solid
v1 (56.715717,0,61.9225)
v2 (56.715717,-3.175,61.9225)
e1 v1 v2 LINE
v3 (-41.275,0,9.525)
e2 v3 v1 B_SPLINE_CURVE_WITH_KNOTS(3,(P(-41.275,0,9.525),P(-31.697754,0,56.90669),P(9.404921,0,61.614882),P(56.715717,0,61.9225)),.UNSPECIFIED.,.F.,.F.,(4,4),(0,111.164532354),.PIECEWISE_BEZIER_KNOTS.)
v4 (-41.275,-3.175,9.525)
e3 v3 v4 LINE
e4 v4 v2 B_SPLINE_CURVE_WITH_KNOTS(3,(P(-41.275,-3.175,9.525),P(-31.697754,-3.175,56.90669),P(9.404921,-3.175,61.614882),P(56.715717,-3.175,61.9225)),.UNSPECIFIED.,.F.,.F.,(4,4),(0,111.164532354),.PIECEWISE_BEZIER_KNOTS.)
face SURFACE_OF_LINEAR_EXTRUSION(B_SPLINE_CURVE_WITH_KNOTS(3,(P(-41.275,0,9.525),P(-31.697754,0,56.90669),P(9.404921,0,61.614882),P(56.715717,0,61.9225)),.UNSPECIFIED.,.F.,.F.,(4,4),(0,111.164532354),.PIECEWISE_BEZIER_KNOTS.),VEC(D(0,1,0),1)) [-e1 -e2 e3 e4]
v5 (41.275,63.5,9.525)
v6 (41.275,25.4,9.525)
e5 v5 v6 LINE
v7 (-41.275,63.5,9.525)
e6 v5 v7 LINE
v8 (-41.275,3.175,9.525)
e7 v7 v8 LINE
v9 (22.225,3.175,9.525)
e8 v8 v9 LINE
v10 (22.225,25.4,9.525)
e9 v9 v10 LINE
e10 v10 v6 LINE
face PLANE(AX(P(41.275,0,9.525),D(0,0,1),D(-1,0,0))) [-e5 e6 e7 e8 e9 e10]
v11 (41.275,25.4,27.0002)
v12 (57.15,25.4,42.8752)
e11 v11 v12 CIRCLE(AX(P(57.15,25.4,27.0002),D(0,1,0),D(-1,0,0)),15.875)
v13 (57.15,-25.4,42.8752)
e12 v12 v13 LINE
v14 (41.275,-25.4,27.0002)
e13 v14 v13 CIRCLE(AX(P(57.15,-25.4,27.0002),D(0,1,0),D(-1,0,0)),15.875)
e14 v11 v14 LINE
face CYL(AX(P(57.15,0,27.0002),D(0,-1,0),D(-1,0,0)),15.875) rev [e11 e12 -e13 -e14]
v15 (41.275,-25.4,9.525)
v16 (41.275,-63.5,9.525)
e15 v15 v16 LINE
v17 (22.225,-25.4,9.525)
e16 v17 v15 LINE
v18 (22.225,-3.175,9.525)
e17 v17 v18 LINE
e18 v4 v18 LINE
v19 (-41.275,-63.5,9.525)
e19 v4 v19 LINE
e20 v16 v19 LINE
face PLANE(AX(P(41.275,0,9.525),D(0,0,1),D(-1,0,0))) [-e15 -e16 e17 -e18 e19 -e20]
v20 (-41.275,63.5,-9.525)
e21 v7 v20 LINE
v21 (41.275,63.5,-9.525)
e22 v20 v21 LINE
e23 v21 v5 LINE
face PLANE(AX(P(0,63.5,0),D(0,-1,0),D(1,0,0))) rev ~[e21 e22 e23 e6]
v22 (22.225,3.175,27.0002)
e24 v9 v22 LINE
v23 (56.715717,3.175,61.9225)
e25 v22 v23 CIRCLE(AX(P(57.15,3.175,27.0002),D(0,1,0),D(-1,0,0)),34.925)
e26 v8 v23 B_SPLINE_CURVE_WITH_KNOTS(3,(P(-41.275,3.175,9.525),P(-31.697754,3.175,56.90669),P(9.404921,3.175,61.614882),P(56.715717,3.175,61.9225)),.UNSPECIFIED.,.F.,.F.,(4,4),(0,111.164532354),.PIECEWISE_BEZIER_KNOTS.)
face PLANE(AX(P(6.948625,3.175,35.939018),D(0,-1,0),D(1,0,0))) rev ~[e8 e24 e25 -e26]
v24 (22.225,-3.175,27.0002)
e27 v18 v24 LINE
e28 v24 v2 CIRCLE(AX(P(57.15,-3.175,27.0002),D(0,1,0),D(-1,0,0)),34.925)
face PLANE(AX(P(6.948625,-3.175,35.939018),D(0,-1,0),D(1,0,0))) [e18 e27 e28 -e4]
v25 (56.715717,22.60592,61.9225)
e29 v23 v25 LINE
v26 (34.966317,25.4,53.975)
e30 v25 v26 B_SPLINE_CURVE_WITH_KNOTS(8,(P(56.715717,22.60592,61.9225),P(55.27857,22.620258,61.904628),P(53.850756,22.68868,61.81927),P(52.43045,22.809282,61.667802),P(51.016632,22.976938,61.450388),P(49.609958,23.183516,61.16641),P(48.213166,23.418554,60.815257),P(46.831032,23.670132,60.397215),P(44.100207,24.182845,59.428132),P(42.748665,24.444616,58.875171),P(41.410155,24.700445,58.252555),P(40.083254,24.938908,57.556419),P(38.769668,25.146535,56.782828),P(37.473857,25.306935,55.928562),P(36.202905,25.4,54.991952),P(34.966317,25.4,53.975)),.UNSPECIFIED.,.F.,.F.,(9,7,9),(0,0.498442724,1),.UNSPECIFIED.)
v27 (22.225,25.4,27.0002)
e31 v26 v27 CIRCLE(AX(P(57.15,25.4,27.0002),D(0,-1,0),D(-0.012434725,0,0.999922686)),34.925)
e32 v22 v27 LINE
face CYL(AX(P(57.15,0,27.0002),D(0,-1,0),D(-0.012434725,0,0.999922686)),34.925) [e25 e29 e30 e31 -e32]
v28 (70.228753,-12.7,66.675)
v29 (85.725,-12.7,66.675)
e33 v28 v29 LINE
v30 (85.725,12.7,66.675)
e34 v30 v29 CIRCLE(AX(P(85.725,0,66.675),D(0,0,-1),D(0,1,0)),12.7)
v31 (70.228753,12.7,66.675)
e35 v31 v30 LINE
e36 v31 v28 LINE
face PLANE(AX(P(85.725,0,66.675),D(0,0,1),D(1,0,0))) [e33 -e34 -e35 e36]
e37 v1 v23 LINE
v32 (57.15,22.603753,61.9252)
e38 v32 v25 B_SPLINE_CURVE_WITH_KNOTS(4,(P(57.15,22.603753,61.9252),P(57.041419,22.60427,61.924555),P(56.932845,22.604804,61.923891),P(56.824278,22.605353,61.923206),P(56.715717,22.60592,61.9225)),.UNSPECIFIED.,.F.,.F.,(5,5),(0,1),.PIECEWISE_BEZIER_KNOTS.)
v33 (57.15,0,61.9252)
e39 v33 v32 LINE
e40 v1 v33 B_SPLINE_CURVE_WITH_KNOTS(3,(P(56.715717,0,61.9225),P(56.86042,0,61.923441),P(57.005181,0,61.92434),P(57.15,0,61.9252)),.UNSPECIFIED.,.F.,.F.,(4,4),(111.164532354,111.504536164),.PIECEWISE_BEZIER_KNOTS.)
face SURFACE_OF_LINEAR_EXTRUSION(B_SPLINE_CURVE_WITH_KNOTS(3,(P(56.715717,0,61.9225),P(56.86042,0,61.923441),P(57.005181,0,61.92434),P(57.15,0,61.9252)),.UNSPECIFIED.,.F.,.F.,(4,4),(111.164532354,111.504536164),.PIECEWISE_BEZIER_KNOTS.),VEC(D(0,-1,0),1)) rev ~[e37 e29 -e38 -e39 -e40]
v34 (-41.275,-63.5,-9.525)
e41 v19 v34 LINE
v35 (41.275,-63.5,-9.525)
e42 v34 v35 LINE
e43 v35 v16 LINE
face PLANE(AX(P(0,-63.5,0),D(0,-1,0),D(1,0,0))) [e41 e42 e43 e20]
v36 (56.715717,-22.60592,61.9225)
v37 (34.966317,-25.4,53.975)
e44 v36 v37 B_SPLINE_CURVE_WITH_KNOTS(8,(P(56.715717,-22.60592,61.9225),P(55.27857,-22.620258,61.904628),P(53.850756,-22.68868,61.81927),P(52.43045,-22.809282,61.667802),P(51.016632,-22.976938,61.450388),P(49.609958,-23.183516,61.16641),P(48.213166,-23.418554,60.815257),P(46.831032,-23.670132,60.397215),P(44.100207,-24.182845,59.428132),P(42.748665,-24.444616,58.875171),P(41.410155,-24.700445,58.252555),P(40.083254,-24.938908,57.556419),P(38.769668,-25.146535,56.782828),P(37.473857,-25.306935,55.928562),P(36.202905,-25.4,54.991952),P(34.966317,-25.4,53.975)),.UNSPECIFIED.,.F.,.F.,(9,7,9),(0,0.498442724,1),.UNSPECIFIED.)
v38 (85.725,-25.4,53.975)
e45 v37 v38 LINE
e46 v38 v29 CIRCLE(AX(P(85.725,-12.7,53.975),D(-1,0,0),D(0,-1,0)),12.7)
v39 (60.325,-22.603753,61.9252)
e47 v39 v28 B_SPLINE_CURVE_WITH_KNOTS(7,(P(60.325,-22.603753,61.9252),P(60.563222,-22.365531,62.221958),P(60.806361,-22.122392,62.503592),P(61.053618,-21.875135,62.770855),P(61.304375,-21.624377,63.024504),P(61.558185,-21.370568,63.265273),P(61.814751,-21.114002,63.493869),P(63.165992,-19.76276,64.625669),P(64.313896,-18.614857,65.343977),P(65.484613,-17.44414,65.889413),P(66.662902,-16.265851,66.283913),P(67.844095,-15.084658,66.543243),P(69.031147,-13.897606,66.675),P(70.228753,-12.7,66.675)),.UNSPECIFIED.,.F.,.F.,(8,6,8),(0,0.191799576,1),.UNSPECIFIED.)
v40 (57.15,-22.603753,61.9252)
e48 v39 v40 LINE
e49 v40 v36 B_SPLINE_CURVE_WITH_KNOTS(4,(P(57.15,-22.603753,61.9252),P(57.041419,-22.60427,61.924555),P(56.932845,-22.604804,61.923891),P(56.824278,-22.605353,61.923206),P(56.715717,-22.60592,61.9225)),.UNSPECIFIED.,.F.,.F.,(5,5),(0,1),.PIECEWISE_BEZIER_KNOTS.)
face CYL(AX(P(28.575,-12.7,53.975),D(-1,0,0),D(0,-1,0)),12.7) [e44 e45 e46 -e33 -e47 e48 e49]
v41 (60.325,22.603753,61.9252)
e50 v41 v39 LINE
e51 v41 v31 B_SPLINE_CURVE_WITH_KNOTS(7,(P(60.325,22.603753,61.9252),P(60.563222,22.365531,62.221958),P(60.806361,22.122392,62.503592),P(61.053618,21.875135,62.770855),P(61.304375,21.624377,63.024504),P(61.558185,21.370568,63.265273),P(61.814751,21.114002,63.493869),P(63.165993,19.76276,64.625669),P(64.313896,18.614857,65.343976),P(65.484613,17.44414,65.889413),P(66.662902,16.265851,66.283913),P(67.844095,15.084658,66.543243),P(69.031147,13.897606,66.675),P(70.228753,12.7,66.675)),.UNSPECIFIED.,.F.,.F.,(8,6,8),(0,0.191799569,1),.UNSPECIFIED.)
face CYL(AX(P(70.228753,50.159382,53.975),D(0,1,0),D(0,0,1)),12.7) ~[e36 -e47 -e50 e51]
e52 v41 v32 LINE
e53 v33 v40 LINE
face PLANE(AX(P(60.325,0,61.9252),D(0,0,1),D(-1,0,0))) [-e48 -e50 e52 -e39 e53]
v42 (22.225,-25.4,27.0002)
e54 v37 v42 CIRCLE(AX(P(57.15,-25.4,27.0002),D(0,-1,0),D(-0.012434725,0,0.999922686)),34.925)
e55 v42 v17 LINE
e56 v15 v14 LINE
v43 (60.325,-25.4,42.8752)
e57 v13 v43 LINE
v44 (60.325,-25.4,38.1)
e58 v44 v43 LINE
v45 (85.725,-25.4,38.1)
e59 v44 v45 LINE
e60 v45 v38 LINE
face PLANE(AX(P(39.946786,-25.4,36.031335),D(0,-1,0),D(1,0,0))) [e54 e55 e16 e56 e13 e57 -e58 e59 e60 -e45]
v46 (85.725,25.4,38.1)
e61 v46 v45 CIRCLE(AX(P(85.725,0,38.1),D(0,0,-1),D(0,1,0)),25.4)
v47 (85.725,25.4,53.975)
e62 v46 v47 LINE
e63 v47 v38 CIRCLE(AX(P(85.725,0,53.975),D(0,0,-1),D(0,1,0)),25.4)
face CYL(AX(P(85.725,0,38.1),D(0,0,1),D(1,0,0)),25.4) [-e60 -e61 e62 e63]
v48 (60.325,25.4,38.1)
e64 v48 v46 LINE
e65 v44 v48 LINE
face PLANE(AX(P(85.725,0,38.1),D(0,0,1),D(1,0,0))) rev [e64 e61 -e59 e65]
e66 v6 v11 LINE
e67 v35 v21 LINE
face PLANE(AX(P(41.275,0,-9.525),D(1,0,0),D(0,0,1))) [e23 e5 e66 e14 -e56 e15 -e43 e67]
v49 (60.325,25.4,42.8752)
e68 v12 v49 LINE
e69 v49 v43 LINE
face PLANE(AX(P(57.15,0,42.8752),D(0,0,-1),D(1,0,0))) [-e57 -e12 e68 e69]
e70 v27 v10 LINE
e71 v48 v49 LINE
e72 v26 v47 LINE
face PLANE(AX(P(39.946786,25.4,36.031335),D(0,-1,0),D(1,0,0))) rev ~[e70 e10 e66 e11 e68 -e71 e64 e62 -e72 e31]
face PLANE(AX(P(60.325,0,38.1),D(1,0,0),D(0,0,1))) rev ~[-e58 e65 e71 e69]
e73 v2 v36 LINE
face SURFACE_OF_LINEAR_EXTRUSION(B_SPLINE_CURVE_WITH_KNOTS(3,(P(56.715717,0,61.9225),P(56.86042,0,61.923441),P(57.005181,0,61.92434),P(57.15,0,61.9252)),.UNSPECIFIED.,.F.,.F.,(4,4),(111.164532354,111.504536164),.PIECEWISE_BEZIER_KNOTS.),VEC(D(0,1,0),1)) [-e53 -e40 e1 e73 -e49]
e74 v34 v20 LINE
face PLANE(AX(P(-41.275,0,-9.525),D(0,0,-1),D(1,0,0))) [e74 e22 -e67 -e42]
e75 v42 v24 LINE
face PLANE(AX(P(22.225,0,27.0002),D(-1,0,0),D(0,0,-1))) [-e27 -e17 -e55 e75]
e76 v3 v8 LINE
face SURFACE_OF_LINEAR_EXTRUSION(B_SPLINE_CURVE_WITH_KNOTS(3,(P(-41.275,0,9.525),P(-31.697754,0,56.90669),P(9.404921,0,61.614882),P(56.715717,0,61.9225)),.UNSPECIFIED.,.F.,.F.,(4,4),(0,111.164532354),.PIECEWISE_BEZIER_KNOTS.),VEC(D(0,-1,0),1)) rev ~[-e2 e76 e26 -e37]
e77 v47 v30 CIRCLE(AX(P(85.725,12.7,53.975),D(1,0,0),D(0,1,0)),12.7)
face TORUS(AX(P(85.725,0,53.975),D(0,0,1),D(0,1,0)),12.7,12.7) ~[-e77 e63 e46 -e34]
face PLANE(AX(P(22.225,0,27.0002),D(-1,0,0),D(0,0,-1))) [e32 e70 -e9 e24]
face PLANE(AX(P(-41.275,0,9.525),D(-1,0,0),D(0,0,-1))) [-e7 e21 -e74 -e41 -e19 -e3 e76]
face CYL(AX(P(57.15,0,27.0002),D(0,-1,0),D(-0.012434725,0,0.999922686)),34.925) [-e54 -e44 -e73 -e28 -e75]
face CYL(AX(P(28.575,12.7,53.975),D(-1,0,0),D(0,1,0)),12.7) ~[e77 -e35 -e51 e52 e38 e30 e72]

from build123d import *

# Parameters (mm, degrees)
F1_DEPTH    = 63.5
F0_W        = 25.4
F0_H        = 19.05
F0_H_2      = 4.7498
F0_H_3      = 4.7752
F2_DEPTH    = 25.4
F4_DEPTH    = 3.175
F5_T1_DEPTH = 100.3187641102
F5_T3_DEPTH = 57.15
F5_T6_ANGLE = 180


# Not quite as in the source:
# - a fillet or chamfer that OpenCascade refuses, or shapes differently, is made with other operations: its cross-section is extruded or revolved along the edge and cut away or added


with BuildPart() as f1:
    # F0 (on Front) → F1 (new body, symmetric)
    with BuildSketch(Plane.XZ):
        Polygon((41.275, -9.525), (41.275, 9.525), (22.225, 9.525), (-41.275, 9.525), (-41.275, -9.525), align=None)
    extrude(amount=F1_DEPTH, both=True)

    # F0 (on Front) → F2 (join, symmetric)
    with BuildSketch(Plane.XZ):
        with BuildLine():
            Line((22.225, 9.525), (41.275, 9.525))
            Line((41.275, 9.525), (41.275, 27.0002))
            ThreePointArc((41.275, 27.0002), (45.9246798487, 38.2255201513), (57.15, 42.8752))
            Line((57.15, 42.8752), (60.325, 42.8752))
            Line((60.325, 42.8752), (60.325, 61.9252))
            Line((60.325, 61.9252), (57.15, 61.9252))
            add(Edge.make_bspline(
                [(56.7157172379, 61.9224998023), (56.8604203243, 61.9234406697), (57.0051814864, 61.9243403706), (57.15, 61.9252)],
                knots=[111.1645323541, 111.1645323541, 111.1645323541, 111.1645323541, 111.5045361635, 111.5045361635, 111.5045361635, 111.5045361635], degree=3))
            ThreePointArc((56.7157172379, 61.9224998023), (32.3012278929, 51.5418818855), (22.225, 27.0002))
            Line((22.225, 27.0002), (22.225, 9.525))
        make_face()
        with Locations((73.025, 52.4002)):
            Rectangle(F0_W, F0_H)
        with Locations((73.025, 64.3001)):
            Rectangle(F0_W, F0_H_2)
        with Locations((73.025, 40.4876)):
            Rectangle(F0_W, F0_H_3)
    extrude(amount=F2_DEPTH, both=True)

    # F0 (on Front) → F3 (revolve)
    with BuildSketch(Plane.XZ):
        Polygon((85.725, 61.9252), (85.725, 42.8752), (85.725, 38.1), (111.125, 38.1), (111.125, 66.675), (85.725, 66.675), align=None)
    revolve(axis=Axis((85.725, 0, 52.3875), (0, 0, 1)))

    # F0 (on Front) → F4 (join, symmetric)
    with BuildSketch(Plane.XZ):
        with BuildLine():
            Line((-41.275, 9.525), (22.225, 9.525))
            Line((22.225, 9.525), (22.225, 27.0002))
            ThreePointArc((22.225, 27.0002), (32.3012278929, 51.5418818855), (56.7157172379, 61.9224998023))
            add(Edge.make_bspline(
                [(-41.275, 9.525), (-31.6977544753, 56.9066902811), (9.4049210672, 61.6148824052), (56.7157172379, 61.9224998023)],
                knots=[0, 0, 0, 0, 111.1645323541, 111.1645323541, 111.1645323541, 111.1645323541], degree=3))
        make_face()
    extrude(amount=F4_DEPTH, both=True)

    # F5: fillet of radius 12.7 on 4 edges, made by hand

    # F5_s2 → F5_t1 (cut)
    with BuildSketch(Plane.XZ.offset(-50.1593820551)):
        with BuildLine():
            ThreePointArc((70.228752822, 66.675), (64.7368287512, 65.4261471041), (60.325, 61.9252))
            Line((60.325, 61.9252), (60.325, 66.675))
            Line((60.325, 66.675), (70.228752822, 66.675))
        make_face()
    extrude(amount=F5_T1_DEPTH, mode=Mode.SUBTRACT)

    # F5_s4 → F5_t3 (cut)
    with BuildSketch(Plane.YZ.offset(28.575)):
        with BuildLine():
            ThreePointArc((-25.4, 53.975), (-21.6802561211, 62.9552561211), (-12.7, 66.675))
            Line((-12.7, 66.675), (-25.4, 66.675))
            Line((-25.4, 66.675), (-25.4, 53.975))
        make_face()
        with BuildLine():
            ThreePointArc((25.4, 53.975), (21.6802561211, 62.9552561211), (12.7, 66.675))
            Line((12.7, 66.675), (25.4, 66.675))
            Line((25.4, 66.675), (25.4, 53.975))
        make_face()
    extrude(amount=F5_T3_DEPTH, mode=Mode.SUBTRACT)

    # F5_s5 → F5_t6 (revolve, cut)
    with BuildSketch(Plane.YZ.offset(85.725)):
        with BuildLine():
            ThreePointArc((25.4, 53.975), (21.6802561211, 62.9552561211), (12.7, 66.675))
            Line((12.7, 66.675), (25.4, 66.675))
            Line((25.4, 66.675), (25.4, 53.975))
        make_face()
    revolve(axis=Axis((85.725, 0, 66.675), (0, 0, -1)), revolution_arc=F5_T6_ANGLE, mode=Mode.SUBTRACT)


solid = f1.part
